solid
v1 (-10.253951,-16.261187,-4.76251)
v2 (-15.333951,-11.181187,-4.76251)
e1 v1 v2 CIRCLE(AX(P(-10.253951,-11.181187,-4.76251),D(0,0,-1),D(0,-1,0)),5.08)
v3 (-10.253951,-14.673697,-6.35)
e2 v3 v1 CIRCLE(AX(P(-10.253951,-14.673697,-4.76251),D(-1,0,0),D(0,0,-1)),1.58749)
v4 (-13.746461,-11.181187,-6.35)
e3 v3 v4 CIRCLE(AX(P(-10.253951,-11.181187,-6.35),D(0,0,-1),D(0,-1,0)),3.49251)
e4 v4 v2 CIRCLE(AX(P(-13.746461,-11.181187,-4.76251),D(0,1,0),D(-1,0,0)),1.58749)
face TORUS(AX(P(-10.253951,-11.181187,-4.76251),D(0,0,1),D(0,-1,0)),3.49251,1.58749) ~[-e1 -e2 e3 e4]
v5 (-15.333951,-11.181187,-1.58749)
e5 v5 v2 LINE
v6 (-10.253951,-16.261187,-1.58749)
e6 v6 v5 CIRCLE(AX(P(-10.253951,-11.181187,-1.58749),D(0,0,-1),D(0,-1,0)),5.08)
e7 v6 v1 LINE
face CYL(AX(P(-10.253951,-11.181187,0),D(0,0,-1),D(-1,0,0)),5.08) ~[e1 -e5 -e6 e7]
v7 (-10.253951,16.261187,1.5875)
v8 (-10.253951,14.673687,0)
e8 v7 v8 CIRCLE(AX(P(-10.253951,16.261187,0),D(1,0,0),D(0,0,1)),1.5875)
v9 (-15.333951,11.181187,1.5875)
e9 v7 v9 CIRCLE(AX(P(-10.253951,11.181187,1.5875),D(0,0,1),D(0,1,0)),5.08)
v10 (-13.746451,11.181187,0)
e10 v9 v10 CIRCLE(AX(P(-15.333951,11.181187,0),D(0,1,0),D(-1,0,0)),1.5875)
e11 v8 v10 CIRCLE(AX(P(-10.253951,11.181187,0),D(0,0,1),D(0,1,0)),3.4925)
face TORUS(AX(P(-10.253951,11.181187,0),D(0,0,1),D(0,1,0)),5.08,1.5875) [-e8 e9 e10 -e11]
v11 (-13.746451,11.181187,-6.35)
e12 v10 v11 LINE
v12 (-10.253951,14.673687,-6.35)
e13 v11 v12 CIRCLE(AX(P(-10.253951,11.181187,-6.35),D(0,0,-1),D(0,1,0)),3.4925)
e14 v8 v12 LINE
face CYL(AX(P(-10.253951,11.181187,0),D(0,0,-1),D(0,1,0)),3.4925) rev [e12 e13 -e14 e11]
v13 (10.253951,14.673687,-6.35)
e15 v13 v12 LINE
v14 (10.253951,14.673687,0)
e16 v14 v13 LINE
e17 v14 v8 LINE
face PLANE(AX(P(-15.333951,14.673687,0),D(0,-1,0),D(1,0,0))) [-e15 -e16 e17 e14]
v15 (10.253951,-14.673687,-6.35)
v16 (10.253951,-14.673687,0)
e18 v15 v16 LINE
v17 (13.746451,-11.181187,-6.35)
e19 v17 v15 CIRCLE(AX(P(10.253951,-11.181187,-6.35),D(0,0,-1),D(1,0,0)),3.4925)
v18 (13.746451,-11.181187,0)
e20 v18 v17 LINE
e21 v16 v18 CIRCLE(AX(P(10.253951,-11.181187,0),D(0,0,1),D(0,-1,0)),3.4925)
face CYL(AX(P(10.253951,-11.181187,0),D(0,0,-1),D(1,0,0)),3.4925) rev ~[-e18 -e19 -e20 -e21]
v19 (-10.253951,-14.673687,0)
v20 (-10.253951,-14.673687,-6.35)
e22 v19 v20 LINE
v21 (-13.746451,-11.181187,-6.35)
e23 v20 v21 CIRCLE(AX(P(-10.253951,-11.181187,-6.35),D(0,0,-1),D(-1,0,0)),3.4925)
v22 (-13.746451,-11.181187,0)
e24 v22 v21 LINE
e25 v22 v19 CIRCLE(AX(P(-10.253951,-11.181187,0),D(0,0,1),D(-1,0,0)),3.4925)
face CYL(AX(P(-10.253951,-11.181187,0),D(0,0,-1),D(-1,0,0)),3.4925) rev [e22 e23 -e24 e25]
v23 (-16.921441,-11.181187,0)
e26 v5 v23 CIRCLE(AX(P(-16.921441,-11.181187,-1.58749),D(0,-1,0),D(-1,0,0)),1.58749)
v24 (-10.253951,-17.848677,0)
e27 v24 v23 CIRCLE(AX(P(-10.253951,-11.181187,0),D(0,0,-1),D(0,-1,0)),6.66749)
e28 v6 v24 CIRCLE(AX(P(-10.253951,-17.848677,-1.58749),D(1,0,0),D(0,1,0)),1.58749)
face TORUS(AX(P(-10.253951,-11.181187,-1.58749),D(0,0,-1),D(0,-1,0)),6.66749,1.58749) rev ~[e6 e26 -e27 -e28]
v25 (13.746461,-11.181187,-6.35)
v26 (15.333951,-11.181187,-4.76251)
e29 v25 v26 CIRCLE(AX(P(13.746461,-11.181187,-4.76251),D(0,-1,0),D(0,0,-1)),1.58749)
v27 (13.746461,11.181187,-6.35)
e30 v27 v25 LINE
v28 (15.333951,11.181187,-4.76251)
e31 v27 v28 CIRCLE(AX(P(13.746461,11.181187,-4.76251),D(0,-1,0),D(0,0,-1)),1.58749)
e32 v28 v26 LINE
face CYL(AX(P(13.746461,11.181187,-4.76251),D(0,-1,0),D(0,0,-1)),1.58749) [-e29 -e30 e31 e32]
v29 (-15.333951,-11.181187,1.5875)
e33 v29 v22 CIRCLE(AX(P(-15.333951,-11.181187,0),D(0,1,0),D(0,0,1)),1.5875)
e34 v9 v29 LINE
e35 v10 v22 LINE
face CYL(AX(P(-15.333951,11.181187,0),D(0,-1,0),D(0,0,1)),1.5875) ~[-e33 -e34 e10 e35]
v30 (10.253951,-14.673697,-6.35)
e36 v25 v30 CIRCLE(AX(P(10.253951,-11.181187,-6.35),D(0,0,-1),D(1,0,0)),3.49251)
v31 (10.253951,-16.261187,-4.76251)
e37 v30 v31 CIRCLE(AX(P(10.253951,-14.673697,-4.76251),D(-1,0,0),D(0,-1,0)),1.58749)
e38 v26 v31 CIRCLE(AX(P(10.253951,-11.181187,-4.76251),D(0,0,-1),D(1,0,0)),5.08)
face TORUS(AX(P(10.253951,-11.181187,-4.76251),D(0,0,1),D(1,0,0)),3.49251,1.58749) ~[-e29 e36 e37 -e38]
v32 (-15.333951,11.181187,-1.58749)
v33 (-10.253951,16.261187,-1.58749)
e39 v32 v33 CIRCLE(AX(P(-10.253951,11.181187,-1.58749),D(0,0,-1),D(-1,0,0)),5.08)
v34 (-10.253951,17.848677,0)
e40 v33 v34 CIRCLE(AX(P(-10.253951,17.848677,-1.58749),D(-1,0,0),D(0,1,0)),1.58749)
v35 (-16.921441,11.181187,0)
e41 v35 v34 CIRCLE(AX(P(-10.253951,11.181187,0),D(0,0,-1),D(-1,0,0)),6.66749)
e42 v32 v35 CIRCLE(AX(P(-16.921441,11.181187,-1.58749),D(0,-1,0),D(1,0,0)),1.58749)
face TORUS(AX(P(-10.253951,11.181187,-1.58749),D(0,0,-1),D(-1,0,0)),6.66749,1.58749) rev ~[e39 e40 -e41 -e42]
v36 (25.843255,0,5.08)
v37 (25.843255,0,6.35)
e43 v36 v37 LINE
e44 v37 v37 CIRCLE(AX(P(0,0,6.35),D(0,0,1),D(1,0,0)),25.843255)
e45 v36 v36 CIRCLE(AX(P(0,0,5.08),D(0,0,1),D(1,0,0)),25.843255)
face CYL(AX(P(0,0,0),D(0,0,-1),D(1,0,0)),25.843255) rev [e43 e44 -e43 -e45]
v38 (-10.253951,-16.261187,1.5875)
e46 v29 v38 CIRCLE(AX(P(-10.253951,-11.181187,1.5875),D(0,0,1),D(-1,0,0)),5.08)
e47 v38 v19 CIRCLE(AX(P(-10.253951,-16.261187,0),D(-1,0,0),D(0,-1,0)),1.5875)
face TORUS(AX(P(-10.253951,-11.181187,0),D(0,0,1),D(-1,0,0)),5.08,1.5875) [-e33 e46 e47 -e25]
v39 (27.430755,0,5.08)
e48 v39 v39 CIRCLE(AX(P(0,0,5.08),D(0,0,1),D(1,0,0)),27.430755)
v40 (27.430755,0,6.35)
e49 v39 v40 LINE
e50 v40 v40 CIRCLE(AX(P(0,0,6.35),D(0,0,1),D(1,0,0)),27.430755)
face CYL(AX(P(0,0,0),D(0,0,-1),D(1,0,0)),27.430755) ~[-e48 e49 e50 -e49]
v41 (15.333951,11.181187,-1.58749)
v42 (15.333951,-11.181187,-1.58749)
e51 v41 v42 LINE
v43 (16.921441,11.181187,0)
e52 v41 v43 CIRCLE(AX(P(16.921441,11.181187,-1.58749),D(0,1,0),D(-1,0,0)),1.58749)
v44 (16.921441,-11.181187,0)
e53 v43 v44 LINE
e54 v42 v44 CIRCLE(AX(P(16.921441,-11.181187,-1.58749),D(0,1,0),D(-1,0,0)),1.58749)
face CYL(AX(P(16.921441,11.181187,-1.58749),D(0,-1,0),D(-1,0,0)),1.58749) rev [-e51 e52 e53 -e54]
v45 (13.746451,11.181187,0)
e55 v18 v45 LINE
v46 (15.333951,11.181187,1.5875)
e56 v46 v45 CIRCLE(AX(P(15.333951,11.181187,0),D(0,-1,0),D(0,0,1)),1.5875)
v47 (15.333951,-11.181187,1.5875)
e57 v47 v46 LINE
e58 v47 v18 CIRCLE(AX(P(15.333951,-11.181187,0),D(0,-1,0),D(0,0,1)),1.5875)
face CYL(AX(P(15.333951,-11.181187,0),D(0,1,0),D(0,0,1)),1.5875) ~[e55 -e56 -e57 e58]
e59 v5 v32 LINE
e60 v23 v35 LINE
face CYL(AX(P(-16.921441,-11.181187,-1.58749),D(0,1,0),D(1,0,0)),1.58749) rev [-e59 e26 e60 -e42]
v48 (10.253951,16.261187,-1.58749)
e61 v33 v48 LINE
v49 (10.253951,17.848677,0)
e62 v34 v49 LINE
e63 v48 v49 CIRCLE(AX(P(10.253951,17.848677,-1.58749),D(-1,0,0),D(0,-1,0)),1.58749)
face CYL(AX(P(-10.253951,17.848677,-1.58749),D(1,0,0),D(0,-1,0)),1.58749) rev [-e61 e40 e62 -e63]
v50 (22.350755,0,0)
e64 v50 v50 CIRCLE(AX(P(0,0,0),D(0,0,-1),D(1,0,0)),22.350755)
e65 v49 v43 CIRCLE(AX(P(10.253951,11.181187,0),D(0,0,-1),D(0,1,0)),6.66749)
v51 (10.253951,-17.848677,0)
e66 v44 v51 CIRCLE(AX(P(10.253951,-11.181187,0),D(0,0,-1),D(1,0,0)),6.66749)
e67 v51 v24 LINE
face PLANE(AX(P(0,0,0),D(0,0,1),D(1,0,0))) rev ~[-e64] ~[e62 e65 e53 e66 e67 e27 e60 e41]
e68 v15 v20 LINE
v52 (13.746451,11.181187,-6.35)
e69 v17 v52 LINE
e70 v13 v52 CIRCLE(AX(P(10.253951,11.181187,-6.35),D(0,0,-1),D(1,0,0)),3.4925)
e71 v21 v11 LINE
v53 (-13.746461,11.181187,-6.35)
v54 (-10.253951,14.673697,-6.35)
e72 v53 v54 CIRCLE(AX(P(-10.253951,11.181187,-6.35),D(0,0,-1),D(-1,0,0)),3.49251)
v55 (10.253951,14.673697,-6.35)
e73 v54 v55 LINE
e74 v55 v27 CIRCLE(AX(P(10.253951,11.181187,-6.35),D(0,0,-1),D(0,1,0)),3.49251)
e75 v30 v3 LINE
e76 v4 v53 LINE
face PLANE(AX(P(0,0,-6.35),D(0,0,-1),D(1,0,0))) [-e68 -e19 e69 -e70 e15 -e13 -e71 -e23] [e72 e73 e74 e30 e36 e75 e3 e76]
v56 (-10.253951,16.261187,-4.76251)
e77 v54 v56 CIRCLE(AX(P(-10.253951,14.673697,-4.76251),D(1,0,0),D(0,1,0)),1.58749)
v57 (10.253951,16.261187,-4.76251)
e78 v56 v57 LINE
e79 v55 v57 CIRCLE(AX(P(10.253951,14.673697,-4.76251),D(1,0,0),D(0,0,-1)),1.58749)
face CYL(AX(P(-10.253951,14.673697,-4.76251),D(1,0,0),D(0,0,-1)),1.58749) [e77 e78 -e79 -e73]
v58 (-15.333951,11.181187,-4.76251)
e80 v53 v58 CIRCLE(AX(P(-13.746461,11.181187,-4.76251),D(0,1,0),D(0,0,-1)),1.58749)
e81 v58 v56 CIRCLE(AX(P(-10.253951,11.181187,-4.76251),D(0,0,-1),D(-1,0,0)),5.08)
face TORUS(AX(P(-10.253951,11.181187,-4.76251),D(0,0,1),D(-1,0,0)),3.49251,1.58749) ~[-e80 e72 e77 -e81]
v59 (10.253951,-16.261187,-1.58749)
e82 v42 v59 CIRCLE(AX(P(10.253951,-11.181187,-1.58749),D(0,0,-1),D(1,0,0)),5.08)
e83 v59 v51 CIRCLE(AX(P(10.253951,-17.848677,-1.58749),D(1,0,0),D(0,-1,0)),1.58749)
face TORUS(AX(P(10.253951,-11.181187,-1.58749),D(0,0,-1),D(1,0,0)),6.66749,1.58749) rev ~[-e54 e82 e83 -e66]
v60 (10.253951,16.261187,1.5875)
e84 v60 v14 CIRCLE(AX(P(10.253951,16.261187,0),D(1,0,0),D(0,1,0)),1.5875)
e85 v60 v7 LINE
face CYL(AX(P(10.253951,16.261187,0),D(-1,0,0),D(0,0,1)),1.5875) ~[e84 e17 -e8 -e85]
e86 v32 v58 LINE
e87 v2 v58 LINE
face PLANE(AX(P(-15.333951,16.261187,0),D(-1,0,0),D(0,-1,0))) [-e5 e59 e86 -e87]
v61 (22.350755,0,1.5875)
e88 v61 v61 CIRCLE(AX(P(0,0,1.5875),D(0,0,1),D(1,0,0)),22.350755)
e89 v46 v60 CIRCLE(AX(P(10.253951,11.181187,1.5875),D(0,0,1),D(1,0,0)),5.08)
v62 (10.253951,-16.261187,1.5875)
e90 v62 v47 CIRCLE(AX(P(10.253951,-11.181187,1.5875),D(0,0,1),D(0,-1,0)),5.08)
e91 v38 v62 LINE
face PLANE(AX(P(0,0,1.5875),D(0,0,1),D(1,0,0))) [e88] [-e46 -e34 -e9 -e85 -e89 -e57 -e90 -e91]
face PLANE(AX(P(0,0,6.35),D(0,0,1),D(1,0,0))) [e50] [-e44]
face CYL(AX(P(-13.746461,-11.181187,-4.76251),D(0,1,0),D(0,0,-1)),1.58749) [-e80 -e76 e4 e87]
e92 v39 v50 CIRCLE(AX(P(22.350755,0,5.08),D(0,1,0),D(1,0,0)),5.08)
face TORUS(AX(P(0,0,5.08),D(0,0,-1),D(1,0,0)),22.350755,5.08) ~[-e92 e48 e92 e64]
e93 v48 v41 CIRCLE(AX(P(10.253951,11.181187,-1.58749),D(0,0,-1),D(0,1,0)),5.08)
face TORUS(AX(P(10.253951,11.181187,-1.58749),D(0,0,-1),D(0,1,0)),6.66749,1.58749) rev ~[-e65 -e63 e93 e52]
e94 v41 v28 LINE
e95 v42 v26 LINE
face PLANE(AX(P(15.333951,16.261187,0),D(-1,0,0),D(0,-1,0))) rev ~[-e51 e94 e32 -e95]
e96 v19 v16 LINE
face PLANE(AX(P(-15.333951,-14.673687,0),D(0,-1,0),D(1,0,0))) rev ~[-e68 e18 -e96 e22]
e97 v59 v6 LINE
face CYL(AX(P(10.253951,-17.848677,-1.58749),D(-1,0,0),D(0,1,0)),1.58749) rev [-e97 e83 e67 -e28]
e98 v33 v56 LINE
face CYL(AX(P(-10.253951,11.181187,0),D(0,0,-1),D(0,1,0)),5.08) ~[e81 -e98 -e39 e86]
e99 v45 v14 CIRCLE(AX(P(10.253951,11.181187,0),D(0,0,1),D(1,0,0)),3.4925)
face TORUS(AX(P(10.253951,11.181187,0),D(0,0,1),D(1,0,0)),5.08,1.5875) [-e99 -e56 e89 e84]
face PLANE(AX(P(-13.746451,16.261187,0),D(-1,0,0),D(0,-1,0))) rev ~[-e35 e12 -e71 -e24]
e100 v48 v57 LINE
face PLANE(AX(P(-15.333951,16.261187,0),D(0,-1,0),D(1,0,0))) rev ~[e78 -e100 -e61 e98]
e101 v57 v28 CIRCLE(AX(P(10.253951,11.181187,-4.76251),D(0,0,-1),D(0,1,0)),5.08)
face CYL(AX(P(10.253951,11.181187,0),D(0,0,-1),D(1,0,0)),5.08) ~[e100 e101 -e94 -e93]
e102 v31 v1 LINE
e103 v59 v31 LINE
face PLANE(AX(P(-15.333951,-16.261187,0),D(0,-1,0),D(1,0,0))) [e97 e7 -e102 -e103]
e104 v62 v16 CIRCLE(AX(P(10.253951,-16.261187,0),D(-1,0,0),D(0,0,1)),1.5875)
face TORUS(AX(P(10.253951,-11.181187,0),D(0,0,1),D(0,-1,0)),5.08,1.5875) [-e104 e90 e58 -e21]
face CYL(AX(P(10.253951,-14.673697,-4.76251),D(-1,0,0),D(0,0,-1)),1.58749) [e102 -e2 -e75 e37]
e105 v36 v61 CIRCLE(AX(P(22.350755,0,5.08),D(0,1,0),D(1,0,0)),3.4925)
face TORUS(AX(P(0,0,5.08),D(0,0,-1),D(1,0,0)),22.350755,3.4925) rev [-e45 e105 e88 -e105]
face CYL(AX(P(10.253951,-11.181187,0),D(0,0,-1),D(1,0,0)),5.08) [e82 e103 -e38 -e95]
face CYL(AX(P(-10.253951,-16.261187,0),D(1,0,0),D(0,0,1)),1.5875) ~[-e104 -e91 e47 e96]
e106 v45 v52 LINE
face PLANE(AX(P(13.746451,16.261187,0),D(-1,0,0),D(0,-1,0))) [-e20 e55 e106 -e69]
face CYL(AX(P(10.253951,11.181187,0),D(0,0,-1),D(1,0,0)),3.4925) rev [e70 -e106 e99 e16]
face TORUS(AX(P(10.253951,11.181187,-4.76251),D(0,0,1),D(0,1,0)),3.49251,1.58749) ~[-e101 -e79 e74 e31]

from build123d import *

# Parameters (mm, degrees)
F0_R     = 27.4307553129
F1_DEPTH = 6.35
F9_R     = 5.08
F2_T     = -1.5875
F3_W     = 30.6679024691
F3_H     = 32.5223739966
F4_DEPTH = 6.35
F5_R     = 5.08
F6_T     = -1.5875
F7_DEPTH = 6.351
F10_R    = 1.5875
F11_R    = 1.58749


# Not quite as in the source:
# - a fillet or chamfer is up to 0.001 mm smaller than in the source, because OpenCascade refuses the exact size


with BuildPart() as f1:
    # F0 (on Top) → F1 (new body)
    with BuildSketch(Plane.XY):
        Circle(F0_R)
    extrude(amount=F1_DEPTH)

    # F9
    f9_edges = [f1.edges().sort_by_distance(p)[0] for p in [
        (-27.430755, 0, 0),
    ]]
    fillet(f9_edges, radius=F9_R)

    # F2
    f2_openings = [f1.faces().sort_by_distance(p)[0] for p in [
        (0, 0, 6.35),
    ]]
    offset(amount=F2_T, openings=f2_openings)

    # F3 (on face) → F4 (join)
    with BuildSketch(Plane(origin=(0, 0, 0), x_dir=(1, 0, 0), z_dir=(0, 0, -1))):
        Rectangle(F3_W, F3_H)
    extrude(amount=F4_DEPTH)

    # F5
    f5_edges = [f1.edges().sort_by_distance(p)[0] for p in [
        (-15.333951, 16.261187, -3.175),
        (-15.333951, -16.261187, -3.175),
        (15.333951, -16.261187, -3.175),
        (15.333951, 16.261187, -3.175),
    ]]
    fillet(f5_edges, radius=F5_R)

    # F6
    f6_openings = [f1.faces().sort_by_distance(p)[0] for p in [
        (0, 0, -6.35),
    ]]
    offset(amount=F6_T, openings=f6_openings, kind=Kind.INTERSECTION)

    # F7 (cut, through all): a face of the model
    f7_faces = [f1.faces().sort_by_distance(p)[0] for p in [
        (0, 0, 0),
    ]]
    extrude(f7_faces, amount=-F7_DEPTH, mode=Mode.SUBTRACT)

    # F10
    f10_edges = [f1.edges().sort_by_distance(p)[0] for p in [
        (13.746451, 0, 1.5875),
    ]]
    fillet(f10_edges, radius=F10_R)

    # F11 (radius 1.5875 in the source; OpenCascade refuses exactly that, so slightly less here)
    f11_edges = [f1.edges().sort_by_distance(p)[0] for p in [
        (15.333951, 0, 0),
        (15.333951, 11.181187, -3.175),
        (15.333951, -11.181187, -3.175),
        (15.333951, 0, -6.35),
    ]]
    fillet(f11_edges, radius=F11_R)


solid = f1.part
